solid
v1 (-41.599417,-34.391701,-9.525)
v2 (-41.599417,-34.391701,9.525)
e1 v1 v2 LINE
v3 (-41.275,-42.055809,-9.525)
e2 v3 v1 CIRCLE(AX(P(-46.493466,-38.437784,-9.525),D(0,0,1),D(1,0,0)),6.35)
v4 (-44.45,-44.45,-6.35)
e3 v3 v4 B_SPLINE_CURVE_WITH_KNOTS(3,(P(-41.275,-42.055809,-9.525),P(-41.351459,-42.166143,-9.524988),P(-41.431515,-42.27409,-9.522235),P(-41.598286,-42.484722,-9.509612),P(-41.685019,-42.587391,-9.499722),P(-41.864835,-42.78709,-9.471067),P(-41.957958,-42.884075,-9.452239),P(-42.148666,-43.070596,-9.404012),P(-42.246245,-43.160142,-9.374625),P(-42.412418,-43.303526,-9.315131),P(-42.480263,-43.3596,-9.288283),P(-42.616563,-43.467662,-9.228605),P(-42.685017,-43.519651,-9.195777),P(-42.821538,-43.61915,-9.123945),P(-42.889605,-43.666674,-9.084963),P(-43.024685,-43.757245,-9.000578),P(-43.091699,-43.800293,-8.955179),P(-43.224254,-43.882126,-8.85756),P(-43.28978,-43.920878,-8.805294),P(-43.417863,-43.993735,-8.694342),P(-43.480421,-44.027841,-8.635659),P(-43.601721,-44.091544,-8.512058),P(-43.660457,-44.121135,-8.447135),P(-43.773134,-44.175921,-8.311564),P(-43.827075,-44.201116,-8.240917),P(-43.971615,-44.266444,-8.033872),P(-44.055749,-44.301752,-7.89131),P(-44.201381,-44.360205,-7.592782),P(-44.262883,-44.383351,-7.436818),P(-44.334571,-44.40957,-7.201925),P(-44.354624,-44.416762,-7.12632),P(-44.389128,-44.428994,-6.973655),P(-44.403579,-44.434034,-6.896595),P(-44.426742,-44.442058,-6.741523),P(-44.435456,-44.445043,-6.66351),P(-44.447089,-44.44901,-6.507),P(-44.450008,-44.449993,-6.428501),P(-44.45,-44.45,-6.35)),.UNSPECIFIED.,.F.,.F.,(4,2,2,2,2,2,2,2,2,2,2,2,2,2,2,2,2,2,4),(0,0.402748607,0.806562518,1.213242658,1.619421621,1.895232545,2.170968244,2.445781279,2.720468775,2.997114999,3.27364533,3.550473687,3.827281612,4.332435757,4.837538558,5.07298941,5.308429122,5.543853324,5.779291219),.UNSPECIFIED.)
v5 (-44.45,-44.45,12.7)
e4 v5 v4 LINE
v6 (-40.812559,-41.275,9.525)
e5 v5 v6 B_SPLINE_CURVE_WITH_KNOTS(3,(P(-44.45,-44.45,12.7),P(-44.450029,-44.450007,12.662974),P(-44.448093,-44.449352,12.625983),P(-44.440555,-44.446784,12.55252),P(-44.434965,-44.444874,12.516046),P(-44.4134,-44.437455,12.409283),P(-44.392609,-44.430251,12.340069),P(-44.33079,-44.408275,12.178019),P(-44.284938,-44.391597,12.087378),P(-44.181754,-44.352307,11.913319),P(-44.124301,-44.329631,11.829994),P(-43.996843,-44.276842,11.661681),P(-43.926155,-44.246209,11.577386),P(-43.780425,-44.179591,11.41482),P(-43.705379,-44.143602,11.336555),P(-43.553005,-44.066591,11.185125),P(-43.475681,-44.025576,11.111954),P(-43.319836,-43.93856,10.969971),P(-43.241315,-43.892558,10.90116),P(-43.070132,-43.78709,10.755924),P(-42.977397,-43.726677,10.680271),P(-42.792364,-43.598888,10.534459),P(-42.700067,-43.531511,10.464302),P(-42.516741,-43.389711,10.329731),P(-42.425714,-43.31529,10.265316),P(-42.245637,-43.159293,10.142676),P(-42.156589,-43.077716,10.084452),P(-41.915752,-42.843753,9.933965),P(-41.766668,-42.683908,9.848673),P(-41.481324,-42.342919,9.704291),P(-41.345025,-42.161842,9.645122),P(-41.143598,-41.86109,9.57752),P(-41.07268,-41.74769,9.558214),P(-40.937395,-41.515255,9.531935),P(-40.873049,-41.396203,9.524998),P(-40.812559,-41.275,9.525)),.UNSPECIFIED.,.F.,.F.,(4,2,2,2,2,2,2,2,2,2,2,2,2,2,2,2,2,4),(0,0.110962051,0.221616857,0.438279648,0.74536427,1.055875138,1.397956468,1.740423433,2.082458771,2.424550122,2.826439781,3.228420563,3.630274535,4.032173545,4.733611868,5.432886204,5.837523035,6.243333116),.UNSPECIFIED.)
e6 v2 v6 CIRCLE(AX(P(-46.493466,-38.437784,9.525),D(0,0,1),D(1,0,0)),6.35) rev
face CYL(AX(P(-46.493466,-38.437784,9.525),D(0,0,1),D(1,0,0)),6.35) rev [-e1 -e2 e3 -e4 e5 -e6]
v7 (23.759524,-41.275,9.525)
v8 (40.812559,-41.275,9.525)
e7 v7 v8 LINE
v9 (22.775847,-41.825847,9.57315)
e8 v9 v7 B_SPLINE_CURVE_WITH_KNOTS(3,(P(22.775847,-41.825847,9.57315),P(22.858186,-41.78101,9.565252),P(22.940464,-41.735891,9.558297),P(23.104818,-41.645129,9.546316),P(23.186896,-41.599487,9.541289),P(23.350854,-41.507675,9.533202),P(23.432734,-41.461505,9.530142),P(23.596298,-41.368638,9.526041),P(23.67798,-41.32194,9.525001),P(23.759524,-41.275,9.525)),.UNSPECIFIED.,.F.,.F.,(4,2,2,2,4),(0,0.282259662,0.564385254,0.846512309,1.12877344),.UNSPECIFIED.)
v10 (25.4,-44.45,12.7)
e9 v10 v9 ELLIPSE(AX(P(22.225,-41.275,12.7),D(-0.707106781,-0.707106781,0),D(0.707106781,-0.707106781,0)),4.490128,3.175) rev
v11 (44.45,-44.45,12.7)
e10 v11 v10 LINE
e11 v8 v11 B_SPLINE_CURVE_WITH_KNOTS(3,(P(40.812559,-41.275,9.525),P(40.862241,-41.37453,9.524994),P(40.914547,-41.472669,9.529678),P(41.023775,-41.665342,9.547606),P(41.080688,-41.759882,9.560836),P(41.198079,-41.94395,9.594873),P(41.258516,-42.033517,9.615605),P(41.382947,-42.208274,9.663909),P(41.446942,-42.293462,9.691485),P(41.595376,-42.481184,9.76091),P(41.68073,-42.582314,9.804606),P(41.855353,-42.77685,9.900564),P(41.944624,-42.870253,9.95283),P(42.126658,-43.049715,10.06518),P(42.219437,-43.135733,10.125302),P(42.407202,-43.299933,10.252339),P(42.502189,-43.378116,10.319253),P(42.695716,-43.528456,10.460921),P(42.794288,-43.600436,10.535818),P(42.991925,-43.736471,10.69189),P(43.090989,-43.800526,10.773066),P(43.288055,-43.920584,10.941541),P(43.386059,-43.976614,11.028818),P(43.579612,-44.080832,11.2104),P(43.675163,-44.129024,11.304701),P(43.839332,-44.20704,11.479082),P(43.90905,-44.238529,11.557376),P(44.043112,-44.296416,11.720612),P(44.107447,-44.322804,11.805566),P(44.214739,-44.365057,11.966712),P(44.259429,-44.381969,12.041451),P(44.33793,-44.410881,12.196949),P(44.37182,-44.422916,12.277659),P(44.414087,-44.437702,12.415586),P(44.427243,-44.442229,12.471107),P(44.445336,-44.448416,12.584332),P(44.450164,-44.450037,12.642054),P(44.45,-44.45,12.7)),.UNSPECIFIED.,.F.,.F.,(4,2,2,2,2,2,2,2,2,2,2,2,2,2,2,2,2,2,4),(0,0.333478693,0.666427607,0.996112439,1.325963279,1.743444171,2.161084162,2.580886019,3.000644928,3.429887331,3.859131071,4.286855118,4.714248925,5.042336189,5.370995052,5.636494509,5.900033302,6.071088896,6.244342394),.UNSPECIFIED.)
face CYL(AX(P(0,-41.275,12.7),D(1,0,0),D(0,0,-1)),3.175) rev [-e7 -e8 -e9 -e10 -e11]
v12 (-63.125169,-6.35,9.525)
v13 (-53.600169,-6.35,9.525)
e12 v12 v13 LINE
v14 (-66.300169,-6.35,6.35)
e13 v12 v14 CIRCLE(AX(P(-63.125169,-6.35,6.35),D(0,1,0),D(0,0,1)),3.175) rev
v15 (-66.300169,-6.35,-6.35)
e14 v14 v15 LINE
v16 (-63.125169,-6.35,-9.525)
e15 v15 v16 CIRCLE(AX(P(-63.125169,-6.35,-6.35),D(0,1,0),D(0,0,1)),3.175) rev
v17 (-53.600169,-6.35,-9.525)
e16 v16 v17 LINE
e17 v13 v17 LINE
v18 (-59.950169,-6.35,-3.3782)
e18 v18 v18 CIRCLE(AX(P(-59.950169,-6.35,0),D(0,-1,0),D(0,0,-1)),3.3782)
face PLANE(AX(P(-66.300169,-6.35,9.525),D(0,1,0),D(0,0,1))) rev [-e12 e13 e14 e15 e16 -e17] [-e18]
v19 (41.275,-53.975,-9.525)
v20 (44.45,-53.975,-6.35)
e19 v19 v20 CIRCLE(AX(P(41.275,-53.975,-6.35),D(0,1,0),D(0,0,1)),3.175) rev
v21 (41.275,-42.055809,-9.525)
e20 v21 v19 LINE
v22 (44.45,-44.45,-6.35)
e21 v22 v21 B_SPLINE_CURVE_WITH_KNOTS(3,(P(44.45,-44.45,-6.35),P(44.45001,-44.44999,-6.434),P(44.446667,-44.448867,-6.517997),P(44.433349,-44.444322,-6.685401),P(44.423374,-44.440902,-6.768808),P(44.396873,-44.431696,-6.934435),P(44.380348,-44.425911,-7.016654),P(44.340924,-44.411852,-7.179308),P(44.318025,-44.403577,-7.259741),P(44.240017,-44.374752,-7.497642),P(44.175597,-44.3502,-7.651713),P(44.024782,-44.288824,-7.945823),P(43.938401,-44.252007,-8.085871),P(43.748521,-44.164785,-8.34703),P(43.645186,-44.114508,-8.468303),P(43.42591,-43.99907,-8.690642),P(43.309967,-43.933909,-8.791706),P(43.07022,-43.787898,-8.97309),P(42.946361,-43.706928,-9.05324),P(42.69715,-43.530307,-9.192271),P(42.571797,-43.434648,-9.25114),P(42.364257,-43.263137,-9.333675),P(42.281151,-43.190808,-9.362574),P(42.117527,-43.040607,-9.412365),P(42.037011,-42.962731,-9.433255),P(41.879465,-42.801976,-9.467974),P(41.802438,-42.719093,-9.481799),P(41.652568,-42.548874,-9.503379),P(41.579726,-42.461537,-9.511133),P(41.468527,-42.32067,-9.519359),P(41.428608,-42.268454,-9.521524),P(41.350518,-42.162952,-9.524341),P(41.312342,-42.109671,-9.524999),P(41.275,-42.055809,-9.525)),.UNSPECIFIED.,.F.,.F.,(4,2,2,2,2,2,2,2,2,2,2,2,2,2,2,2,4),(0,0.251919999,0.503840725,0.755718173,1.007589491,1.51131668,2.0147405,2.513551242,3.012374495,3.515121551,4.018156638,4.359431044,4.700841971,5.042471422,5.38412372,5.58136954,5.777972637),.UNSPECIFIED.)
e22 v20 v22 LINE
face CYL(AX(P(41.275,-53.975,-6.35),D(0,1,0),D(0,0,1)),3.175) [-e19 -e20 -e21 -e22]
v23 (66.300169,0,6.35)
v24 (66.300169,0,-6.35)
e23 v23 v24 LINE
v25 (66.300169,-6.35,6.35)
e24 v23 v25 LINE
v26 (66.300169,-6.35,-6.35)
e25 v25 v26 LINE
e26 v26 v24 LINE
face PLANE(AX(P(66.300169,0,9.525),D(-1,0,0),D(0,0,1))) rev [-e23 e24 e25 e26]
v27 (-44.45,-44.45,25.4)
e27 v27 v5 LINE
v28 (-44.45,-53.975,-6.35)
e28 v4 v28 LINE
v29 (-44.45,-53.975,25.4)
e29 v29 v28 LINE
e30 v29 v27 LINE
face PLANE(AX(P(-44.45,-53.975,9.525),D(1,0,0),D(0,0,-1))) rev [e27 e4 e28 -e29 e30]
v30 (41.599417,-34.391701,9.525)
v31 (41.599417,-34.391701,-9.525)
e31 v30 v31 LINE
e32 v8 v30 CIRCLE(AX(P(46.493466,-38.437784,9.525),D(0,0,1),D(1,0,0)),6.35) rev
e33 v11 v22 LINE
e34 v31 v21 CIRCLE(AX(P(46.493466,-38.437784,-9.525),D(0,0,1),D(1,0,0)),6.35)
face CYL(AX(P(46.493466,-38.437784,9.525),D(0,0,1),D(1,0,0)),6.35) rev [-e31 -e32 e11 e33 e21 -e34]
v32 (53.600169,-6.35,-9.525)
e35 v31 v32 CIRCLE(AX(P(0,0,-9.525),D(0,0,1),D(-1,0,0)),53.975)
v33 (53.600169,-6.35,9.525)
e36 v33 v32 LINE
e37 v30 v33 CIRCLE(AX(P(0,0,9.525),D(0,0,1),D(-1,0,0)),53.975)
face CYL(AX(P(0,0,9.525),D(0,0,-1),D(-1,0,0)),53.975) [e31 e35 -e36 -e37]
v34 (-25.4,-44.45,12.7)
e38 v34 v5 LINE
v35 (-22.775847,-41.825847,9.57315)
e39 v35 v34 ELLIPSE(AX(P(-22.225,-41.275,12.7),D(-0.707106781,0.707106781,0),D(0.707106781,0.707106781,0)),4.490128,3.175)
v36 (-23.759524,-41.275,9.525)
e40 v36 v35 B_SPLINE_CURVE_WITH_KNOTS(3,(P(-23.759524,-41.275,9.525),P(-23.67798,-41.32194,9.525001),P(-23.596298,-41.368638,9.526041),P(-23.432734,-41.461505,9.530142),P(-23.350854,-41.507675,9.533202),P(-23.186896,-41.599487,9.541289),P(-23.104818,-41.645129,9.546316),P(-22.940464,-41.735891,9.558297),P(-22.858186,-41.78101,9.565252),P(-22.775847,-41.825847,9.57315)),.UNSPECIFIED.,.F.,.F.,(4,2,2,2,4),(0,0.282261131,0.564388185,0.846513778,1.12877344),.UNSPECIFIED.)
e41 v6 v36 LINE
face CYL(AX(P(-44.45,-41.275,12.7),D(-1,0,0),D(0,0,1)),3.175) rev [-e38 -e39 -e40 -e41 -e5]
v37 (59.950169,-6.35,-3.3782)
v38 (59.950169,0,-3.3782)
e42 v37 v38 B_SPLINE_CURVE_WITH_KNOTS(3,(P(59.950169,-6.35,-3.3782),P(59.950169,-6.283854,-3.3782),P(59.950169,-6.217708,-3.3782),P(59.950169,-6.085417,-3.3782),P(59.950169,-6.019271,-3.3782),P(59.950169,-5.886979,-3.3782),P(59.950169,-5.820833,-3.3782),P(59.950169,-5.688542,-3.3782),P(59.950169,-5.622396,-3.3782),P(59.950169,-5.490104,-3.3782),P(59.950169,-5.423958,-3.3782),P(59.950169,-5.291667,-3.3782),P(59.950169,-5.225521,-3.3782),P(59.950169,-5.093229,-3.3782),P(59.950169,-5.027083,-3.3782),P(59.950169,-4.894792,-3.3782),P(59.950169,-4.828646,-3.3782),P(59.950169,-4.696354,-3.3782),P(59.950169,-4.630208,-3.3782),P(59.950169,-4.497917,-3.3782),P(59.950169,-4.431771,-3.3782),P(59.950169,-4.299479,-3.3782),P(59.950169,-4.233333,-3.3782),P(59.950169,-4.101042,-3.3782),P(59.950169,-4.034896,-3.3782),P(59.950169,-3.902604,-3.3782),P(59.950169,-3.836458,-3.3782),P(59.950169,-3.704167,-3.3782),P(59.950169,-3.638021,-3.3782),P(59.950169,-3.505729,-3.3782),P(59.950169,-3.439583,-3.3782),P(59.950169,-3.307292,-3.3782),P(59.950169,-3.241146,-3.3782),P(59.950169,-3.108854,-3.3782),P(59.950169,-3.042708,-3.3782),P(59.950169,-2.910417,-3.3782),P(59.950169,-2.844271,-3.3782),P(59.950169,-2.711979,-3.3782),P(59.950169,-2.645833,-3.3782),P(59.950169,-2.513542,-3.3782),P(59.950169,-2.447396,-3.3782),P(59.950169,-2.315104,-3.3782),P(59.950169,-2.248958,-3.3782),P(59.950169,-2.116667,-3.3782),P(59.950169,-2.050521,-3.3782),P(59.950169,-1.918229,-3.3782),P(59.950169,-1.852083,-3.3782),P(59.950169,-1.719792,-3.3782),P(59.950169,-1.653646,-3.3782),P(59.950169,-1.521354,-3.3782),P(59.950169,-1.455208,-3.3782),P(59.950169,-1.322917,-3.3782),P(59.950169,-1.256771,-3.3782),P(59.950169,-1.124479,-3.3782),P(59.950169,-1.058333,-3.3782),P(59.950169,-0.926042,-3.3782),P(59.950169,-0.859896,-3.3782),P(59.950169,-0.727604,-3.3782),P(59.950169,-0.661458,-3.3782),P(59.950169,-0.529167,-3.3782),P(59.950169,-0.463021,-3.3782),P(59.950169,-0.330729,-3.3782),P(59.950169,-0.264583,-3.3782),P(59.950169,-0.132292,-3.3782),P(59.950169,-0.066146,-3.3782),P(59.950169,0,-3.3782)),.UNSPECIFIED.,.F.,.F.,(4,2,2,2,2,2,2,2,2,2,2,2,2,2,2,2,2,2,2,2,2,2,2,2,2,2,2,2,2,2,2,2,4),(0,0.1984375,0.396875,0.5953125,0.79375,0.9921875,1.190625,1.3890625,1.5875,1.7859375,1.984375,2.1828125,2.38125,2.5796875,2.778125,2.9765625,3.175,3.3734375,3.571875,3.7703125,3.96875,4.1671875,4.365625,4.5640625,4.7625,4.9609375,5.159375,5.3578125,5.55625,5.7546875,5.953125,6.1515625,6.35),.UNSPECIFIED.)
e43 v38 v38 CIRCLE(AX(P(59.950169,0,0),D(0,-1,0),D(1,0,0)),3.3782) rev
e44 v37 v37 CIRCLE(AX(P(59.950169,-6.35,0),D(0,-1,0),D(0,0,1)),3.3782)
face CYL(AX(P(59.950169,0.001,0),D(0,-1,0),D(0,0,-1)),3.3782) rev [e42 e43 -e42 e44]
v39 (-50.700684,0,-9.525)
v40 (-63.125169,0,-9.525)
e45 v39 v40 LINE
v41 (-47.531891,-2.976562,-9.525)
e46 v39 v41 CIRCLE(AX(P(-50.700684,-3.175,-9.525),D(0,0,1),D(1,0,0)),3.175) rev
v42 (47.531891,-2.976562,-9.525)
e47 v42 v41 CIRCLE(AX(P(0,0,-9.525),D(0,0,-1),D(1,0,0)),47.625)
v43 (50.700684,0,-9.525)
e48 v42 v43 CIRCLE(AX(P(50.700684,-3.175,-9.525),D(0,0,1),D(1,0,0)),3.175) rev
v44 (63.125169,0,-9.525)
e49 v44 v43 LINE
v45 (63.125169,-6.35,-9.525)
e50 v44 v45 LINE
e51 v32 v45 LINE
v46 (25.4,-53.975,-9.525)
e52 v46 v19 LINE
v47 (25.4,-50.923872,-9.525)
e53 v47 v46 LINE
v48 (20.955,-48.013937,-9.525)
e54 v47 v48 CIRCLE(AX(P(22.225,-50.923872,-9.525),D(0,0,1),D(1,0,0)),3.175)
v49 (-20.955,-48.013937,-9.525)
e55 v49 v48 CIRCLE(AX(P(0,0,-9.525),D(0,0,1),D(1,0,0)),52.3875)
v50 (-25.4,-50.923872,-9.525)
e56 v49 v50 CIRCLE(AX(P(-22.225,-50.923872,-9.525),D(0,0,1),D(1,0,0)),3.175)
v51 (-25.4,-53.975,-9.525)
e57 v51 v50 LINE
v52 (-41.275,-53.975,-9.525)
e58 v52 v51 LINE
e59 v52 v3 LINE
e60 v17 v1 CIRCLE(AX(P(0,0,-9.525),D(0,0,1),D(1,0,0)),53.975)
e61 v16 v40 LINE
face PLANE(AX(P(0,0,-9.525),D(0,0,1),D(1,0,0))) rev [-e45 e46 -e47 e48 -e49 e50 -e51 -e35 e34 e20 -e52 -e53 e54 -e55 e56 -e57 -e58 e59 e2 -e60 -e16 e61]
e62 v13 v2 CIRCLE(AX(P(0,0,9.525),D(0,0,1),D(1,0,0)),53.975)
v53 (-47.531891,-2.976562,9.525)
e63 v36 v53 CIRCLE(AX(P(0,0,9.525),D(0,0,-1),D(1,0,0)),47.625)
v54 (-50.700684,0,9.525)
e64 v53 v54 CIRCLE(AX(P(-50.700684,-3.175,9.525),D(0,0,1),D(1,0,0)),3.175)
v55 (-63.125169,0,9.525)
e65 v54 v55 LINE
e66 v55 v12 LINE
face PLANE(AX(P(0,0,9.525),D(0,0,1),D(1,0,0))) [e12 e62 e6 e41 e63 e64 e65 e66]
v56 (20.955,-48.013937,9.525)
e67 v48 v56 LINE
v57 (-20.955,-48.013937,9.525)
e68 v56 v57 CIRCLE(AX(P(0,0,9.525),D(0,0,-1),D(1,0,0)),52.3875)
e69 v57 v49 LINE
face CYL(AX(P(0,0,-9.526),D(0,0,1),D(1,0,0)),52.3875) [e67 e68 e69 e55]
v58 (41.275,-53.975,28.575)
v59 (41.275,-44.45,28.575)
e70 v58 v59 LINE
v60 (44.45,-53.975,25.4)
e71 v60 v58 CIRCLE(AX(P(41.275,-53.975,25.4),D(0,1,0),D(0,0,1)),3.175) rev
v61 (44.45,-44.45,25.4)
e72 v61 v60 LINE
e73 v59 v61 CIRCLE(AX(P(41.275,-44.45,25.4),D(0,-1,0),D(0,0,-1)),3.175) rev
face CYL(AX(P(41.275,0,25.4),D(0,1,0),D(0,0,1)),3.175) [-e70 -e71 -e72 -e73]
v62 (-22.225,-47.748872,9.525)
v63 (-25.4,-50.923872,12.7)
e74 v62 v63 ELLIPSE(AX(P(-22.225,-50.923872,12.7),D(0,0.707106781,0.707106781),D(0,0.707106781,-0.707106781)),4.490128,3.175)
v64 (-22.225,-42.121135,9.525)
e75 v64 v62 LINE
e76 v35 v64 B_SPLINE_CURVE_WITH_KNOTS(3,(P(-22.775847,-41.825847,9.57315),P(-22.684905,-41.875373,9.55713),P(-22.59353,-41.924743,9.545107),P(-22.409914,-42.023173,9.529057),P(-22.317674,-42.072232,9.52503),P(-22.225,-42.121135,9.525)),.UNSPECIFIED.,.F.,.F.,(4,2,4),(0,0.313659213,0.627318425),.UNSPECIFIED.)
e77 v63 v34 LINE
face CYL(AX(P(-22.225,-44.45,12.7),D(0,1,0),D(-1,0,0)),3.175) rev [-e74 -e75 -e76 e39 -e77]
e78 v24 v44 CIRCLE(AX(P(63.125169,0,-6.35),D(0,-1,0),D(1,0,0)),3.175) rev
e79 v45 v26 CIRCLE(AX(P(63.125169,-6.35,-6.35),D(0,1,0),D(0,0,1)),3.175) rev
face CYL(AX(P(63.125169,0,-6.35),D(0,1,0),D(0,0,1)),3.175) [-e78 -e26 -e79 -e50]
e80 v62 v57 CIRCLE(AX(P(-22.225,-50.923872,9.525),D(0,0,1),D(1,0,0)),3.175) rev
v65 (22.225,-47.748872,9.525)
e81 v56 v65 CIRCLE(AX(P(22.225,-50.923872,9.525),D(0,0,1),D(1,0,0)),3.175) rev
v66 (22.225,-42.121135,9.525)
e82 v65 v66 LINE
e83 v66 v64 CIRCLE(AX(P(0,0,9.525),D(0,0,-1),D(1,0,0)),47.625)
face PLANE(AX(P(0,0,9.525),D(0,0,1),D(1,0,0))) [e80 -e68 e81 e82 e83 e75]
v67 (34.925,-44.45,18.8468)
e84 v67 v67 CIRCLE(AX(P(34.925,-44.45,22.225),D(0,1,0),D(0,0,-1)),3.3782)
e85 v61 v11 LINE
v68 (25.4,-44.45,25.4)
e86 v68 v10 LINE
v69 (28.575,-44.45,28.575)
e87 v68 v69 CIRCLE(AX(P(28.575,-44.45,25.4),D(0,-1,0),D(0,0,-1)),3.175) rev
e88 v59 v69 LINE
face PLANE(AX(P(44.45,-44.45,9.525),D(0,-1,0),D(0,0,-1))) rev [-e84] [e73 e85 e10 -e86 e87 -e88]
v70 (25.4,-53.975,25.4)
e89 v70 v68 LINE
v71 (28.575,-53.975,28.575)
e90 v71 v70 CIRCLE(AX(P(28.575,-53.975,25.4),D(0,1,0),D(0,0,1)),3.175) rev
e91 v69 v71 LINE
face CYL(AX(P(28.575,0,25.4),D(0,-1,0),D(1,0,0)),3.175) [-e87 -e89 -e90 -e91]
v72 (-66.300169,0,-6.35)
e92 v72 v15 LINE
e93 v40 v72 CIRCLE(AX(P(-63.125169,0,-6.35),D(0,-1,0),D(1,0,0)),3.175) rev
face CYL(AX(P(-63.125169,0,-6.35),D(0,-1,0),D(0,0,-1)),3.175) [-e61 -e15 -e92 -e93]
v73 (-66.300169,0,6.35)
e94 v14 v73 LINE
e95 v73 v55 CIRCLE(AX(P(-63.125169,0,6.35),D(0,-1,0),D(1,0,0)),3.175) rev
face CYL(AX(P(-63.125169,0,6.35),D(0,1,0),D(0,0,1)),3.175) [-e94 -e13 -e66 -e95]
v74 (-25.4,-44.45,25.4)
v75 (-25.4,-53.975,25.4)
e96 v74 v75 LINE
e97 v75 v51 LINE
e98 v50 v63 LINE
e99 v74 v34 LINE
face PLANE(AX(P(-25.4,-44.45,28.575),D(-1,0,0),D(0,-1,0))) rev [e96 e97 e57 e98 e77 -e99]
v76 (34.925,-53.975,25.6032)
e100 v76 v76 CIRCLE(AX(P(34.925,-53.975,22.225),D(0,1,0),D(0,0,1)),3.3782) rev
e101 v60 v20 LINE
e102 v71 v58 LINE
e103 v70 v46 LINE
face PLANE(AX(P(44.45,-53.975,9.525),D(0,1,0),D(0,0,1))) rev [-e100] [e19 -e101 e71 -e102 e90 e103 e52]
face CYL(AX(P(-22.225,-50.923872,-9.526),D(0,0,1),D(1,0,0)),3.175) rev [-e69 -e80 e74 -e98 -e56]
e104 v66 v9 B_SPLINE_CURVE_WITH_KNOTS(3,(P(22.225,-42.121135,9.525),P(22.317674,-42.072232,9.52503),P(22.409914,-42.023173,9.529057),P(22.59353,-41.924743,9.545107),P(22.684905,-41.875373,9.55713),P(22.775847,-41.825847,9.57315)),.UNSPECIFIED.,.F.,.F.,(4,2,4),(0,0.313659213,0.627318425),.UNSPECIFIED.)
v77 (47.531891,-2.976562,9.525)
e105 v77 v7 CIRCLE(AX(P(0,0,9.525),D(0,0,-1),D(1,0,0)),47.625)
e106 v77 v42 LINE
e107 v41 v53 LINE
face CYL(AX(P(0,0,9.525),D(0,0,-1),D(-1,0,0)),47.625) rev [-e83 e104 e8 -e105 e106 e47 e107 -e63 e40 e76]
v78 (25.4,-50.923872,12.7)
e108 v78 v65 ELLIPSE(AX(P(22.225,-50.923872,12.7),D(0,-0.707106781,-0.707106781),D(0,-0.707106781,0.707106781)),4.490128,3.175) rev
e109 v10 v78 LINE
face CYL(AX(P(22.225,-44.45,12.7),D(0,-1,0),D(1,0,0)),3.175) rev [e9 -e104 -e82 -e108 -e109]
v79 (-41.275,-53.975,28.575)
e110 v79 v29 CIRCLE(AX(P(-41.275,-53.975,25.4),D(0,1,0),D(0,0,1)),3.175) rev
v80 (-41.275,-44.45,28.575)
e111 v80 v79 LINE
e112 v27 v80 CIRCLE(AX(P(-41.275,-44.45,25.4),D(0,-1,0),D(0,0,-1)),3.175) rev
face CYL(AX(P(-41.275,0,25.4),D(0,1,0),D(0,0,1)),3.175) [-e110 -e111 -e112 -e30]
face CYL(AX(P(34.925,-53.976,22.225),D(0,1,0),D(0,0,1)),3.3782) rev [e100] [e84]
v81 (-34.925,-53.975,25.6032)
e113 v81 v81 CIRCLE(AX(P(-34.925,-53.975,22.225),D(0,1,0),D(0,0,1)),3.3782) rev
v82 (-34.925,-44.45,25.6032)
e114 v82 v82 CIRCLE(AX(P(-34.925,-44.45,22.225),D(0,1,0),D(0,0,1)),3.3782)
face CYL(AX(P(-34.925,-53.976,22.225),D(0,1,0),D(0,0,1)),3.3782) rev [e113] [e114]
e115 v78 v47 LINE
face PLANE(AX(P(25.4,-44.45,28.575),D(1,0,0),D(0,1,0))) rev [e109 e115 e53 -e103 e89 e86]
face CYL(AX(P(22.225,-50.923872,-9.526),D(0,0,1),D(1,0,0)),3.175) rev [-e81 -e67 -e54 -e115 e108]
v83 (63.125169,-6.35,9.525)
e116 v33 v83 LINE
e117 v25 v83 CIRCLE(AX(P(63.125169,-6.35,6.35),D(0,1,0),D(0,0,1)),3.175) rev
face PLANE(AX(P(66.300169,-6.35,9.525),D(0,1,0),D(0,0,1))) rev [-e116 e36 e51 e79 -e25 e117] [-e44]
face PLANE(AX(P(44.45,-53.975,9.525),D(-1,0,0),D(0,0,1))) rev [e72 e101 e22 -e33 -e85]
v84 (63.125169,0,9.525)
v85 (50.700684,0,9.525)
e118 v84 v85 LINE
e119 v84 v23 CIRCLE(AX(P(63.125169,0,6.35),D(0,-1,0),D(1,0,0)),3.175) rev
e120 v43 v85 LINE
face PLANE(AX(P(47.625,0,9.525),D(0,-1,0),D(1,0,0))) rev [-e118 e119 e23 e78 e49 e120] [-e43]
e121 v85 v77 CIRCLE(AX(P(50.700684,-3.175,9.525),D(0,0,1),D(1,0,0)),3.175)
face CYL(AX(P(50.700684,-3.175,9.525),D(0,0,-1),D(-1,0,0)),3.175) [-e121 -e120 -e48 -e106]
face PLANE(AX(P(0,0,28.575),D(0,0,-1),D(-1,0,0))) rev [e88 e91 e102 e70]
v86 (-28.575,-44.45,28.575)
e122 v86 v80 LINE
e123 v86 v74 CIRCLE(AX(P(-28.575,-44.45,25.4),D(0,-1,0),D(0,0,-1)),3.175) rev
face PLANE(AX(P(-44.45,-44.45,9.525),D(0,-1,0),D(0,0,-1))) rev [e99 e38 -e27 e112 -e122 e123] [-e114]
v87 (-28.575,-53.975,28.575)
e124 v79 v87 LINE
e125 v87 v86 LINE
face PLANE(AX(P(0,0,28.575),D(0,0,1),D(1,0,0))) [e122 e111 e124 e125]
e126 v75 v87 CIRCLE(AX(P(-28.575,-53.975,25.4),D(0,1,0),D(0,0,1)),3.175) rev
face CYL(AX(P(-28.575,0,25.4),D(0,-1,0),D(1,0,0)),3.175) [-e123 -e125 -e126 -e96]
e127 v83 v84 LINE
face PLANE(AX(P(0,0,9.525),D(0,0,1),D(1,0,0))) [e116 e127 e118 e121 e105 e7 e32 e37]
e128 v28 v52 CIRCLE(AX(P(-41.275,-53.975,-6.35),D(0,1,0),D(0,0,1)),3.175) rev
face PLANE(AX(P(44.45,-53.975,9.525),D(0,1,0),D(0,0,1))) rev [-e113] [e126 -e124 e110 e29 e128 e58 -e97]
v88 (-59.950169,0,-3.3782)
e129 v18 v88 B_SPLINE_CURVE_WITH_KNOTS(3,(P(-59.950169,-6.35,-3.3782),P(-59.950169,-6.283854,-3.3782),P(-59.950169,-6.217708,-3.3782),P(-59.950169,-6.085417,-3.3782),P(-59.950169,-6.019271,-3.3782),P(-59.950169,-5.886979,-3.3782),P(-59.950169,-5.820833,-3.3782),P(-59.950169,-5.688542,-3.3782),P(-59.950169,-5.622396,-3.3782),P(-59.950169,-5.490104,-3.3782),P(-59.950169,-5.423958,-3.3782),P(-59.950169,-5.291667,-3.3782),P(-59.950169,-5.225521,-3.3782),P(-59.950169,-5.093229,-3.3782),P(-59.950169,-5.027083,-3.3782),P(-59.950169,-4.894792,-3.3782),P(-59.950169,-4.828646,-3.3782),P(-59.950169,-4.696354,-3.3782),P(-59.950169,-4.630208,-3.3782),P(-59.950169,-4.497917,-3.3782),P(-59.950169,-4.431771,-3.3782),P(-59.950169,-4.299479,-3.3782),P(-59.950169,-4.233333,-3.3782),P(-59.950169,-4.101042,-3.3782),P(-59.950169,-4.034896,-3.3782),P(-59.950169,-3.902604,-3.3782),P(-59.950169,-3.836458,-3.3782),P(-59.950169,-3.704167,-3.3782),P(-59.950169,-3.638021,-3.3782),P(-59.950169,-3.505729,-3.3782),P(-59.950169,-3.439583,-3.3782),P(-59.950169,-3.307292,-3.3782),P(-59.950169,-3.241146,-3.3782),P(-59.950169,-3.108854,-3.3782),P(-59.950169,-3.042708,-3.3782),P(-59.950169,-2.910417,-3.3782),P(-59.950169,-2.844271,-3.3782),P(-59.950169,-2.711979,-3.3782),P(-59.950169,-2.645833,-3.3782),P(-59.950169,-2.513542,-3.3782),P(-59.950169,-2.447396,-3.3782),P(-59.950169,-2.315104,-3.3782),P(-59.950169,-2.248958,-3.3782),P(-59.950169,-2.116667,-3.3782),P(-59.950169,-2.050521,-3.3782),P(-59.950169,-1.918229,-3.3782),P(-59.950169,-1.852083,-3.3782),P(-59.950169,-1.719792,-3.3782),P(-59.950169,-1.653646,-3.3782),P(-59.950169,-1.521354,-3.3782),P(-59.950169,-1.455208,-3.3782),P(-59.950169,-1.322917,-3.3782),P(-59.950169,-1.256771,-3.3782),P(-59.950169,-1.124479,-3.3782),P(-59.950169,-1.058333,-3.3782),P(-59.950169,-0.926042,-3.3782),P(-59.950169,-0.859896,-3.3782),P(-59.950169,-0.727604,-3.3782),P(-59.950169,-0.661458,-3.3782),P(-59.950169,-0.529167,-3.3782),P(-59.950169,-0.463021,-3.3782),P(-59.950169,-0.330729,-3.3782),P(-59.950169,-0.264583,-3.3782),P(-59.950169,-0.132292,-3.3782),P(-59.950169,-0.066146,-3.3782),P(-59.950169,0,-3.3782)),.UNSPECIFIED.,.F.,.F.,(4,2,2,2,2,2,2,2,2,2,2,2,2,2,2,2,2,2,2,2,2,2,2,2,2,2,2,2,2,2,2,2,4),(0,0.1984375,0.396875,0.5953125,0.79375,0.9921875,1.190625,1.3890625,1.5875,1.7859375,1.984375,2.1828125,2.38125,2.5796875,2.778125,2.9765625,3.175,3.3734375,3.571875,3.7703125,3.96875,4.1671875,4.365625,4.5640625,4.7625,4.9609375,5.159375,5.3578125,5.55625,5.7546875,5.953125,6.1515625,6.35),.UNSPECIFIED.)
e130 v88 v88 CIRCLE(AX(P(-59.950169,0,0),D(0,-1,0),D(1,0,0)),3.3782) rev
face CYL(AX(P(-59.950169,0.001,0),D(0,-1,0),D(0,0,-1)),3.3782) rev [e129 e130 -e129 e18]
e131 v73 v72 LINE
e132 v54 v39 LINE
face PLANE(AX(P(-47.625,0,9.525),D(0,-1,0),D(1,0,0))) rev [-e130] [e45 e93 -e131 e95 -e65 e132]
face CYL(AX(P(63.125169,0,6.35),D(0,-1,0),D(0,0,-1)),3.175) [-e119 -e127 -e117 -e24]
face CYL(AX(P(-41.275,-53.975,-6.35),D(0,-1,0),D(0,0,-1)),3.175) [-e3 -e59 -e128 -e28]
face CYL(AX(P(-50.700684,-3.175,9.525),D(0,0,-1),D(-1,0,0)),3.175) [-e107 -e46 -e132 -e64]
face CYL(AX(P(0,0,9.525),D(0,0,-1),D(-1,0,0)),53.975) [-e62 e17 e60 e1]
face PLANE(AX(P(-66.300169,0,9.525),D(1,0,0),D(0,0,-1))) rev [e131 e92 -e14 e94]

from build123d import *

# Parameters (mm, degrees)
BOSS_EXTRUDE2_DEPTH = 9.525
CUT_EXTRUDE2_REACH  = 84.186
SKETCH5_R           = 3.3782
BOSS_EXTRUDE3_DEPTH = 19.05
CUT_EXTRUDE3_REACH  = 86.782
SKETCH7_R           = 3.3782
CUT_EXTRUDE5_REACH  = 89.589
FILLET3_R           = 6.35
FILLET4_R           = 3.175


with BuildPart() as part:
    # Sketch1 → Boss-Extrude2 (new, symmetric)
    with BuildSketch(Plane.XY):
        with BuildLine():
            Line((-47.62499999999999, 0), (-66.30016907622587, -2.27e-15))
            Line((-66.30016907622587, -2.27e-15), (-66.30016907622587, -6.350000000000002))
            Line((-66.30016907622587, -6.350000000000002), (-53.60016907622586, -6.350000000000002))
            ThreePointArc((-53.60016907622586, -6.350000000000002), (-46.217987777388224, -27.87827524810658), (-30.618591166152626, -44.449999999999996))
            Line((-30.618591166152626, -44.449999999999996), (-44.449999999999996, -44.449999999999996))
            Line((-44.449999999999996, -44.449999999999996), (-44.449999999999996, -53.975))
            Line((-44.449999999999996, -53.975), (44.449999999999996, -53.975))
            Line((44.449999999999996, -53.975), (44.449999999999996, -44.449999999999996))
            Line((44.449999999999996, -44.449999999999996), (30.618591166152626, -44.449999999999996))
            ThreePointArc((30.618591166152626, -44.449999999999996), (46.21798777738823, -27.878275248106572), (53.60016907622586, -6.350000000000002))
            Line((53.60016907622586, -6.350000000000002), (66.30016907622587, -6.350000000000002))
            Line((66.30016907622587, -6.350000000000002), (66.30016907622587, -2.27e-15))
            Line((66.30016907622587, -2.27e-15), (47.62499999999999, 0))
            ThreePointArc((47.62499999999999, 0), (-8.75e-15, -47.62499999999999), (-47.62499999999999, 0))
        make_face()
    extrude(amount=BOSS_EXTRUDE2_DEPTH, both=True)

    # Sketch5 → Cut-Extrude2 (cut, up to next)
    with BuildSketch(Plane.XZ.offset(6.350000000000002), mode=Mode.PRIVATE) as cut_extrude2_sk1:
        with Locations(Location((-59.95016907622586, 0, 0), (0, 0, 270))):
            Circle(SKETCH5_R)
    cut_extrude2_tool1 = extrude(cut_extrude2_sk1.sketch, amount=-CUT_EXTRUDE2_REACH, mode=Mode.PRIVATE) & part.part
    # Sketch5 → Cut-Extrude2 (cut, up to next)
    with BuildSketch(Plane.XZ.offset(6.350000000000002), mode=Mode.PRIVATE) as cut_extrude2_sk2:
        with Locations(Location((59.95016907622586, 0, 0), (0, 0, 270))):
            Circle(SKETCH5_R)
    cut_extrude2_tool2 = extrude(cut_extrude2_sk2.sketch, amount=-CUT_EXTRUDE2_REACH, mode=Mode.PRIVATE) & part.part
    add(cut_extrude2_tool1.solids().sort_by_distance((-59.950169, -6.35, 0))[0], mode=Mode.SUBTRACT)
    add(cut_extrude2_tool2.solids().sort_by_distance((59.950169, -6.35, 0))[0], mode=Mode.SUBTRACT)

    # Sketch6 → Boss-Extrude3 (add)
    with BuildSketch(Plane.XY.offset(9.525)):
        Polygon((-44.449999999999996, -44.449999999999996), (-25.39999999999999, -44.449999999999996), (-25.399999999999995, -53.975), (-44.449999999999996, -53.975), align=None)
        Polygon((44.449999999999996, -53.975), (25.399999999999995, -53.975), (25.39999999999999, -44.449999999999996), (44.449999999999996, -44.449999999999996), align=None)
    extrude(amount=BOSS_EXTRUDE3_DEPTH)

    # Sketch7 → Cut-Extrude3 (cut, up to next)
    with BuildSketch(Plane(origin=(0, -44.449999999999996, 0), x_dir=(1, 0, 0), z_dir=(0, 1, 0)), mode=Mode.PRIVATE) as cut_extrude3_sk1:
        with Locations(Location((-34.925, -22.225, 0), (0, 0, 270))):
            Circle(SKETCH7_R)
    cut_extrude3_tool1 = extrude(cut_extrude3_sk1.sketch, amount=-CUT_EXTRUDE3_REACH, mode=Mode.PRIVATE) & part.part
    # Sketch7 → Cut-Extrude3 (cut, up to next)
    with BuildSketch(Plane(origin=(0, -44.449999999999996, 0), x_dir=(1, 0, 0), z_dir=(0, 1, 0)), mode=Mode.PRIVATE) as cut_extrude3_sk2:
        with Locations(Location((34.925, -22.225, 0), (0, 0, 270))):
            Circle(SKETCH7_R)
    cut_extrude3_tool2 = extrude(cut_extrude3_sk2.sketch, amount=-CUT_EXTRUDE3_REACH, mode=Mode.PRIVATE) & part.part
    add(cut_extrude3_tool1.solids().sort_by_distance((-34.925, -44.45, 22.225))[0], mode=Mode.SUBTRACT)
    add(cut_extrude3_tool2.solids().sort_by_distance((34.925, -44.45, 22.225))[0], mode=Mode.SUBTRACT)

    # Sketch10 → Cut-Extrude5 (cut, up to next)
    with BuildSketch(Plane.XY.offset(9.525), mode=Mode.PRIVATE) as cut_extrude5_sk1:
        with BuildLine():
            Line((-25.4, -45.81801126467626), (-25.399999999999995, -53.975))
            Line((-25.399999999999995, -53.975), (25.399999999999995, -53.975))
            Line((25.399999999999995, -53.975), (25.39999999999999, -45.818011264676265))
            ThreePointArc((25.39999999999999, -45.818011264676265), (3.21e-15, -52.3875), (-25.4, -45.81801126467626))
        make_face()
    cut_extrude5_tool1 = extrude(cut_extrude5_sk1.sketch, amount=-CUT_EXTRUDE5_REACH, mode=Mode.PRIVATE) & part.part
    add(cut_extrude5_tool1.solids().sort_by_distance((-24.885493, -49.896506, 9.525))[0], mode=Mode.SUBTRACT)

    # Fillet3
    # the kernel refuses this fillet: 6.35 mm, written as the material it adds along each edge
    with BuildSketch(Plane(origin=(30.618591166152626, -44.449999999999996, -9.525), x_dir=(1, -5.1e-16, 0), z_dir=(0, 0, 1))) as fillet3_piece_1:
        with BuildLine():
            CenterArc((15.87487517374333, 6.012216339895979), FILLET3_R, 140.4182638704102, 110.80957357767647)
            Line((10.980826085333229, 10.058298830433243), (10.88294510356503, 10.13922048024399))
            ThreePointArc((10.88294510356503, 10.13922048024399), (5.753170572776132, 4.742292284663466), (-0.07204374392036078, 0.10458823529411627))
            Line((-0.07204374392036078, 0.10458823529411627), (7e-17, -0.12700000000000244))
            ThreePointArc((7e-17, -0.12700000000000244), (6.915704416923688, -0.1269999999999989), (13.790539507049452, -0.12024432679791633))
            Line((13.790539507049452, -0.12024432679791633), (13.83140883384737, 0))
        make_face()
    extrude(amount=19.05)
    with BuildSketch(Plane(origin=(-30.618591166152626, -44.45, -9.525), x_dir=(-0.7374035751622449, 0.6754524167829585, 0), z_dir=(0, 0, 1))) as fillet3_piece_2:
        with BuildLine():
            CenterArc((15.767155765377446, 6.2892929785445775), FILLET3_R, 151.26145537711756, 110.80957357767625)
            Line((10.199330323609711, 9.342458524335363), (10.08797381477436, 9.403521835251178))
            ThreePointArc((10.08797381477436, 9.403521835251178), (5.013882704873423, 4.764879516213288), (-0.08578245693143738, 0.0936502540456069))
            Line((-0.08578245693143738, 0.0936502540456069), (0.01751906196152835, -0.1257858595708917))
            ThreePointArc((0.01751906196152835, -0.1257858595708917), (7.445601333650467, 0.3890096823710894), (14.873683605339394, -0.12578585957089045))
            Line((14.873683605339394, -0.12578585957089045), (14.89120266730092, 1.6e-16))
        make_face()
    extrude(amount=19.05)

    # Fillet4
    # the kernel refuses this fillet: 3.175 mm, written as the material it adds along each edge
    with BuildSketch(Plane(origin=(-44.45000000000031, -44.44999999999735, 9.525), x_dir=(1.3875e-13, 1, -5.6e-16), z_dir=(1, -1.3875e-13, 0))) as fillet4_piece_1_section:
        with BuildLine():
            CenterArc((FILLET4_R, FILLET4_R), FILLET4_R, 180.00000000000003, 90)
            Line((-8.88e-15, FILLET4_R), (0, 0))
            Line((0, 0), (FILLET4_R, 0))
        make_face()
    fillet4_piece_1 = extrude(amount=19.050000000000317, mode=Mode.PRIVATE)
    fillet4_piece_1 = fillet4_piece_1 - Plane(origin=(-46.493466339895136, -38.43778366010152, 10.266773155518875), x_dir=(-0.7374035751621124, 0.6754524167831031, 0), z_dir=(0, 0, -1)) * Cylinder(6.35, 51, mode=Mode.PRIVATE)
    add(fillet4_piece_1)
    with BuildSketch(Plane(origin=(25.39999999999999, -44.449999999999996, 9.525), x_dir=(-7.5e-16, 1, -5.6e-16), z_dir=(1, 7.5e-16, 0))) as fillet4_piece_2_section:
        with BuildLine():
            CenterArc((FILLET4_R, FILLET4_R), FILLET4_R, 180.00000000000003, 90)
            Line((-8.88e-15, FILLET4_R), (0, 0))
            Line((0, 0), (FILLET4_R, 0))
        make_face()
    fillet4_piece_2 = extrude(amount=19.049999999999997, mode=Mode.PRIVATE)
    fillet4_piece_2 = fillet4_piece_2 - Plane(origin=(46.493466339896, -38.437783660104, 10.26677297379504), x_dir=(1, 0, 0), z_dir=(0, 0, -1)) * Cylinder(6.35, 51, mode=Mode.PRIVATE)
    add(fillet4_piece_2)
    with BuildSketch(Plane(origin=(25.399999999999984, -53.75551126467627, 9.525), x_dir=(-1, -3.7e-16, -5.6e-16), z_dir=(-3.7e-16, 1, 0))) as fillet4_piece_3_section:
        with BuildLine():
            CenterArc((FILLET4_R, FILLET4_R), FILLET4_R, 180.00000000000003, 90)
            Line((-5.33e-15, FILLET4_R), (0, 0))
            Line((0, 0), (FILLET4_R, 0))
        make_face()
    fillet4_piece_3 = extrude(amount=9.305511264676277, mode=Mode.PRIVATE)
    fillet4_piece_3 = fillet4_piece_3 & Plane(origin=(4.44e-15, 3.553e-14, 10.160375888913034), x_dir=(0.4848484848484843, -0.8745981630098072, 0), z_dir=(0, 0, 1)) * Cylinder(52.387500000000024, 32, mode=Mode.PRIVATE)
    add(fillet4_piece_3)
    with BuildSketch(Plane(origin=(-25.39999999999999, -44.449999999999996, 9.525), x_dir=(1, -3.7e-16, -5.6e-16), z_dir=(-3.7e-16, -1, 0))) as fillet4_piece_4_section:
        with BuildLine():
            CenterArc((FILLET4_R, FILLET4_R), FILLET4_R, 180.00000000000003, 90)
            Line((-5.33e-15, FILLET4_R), (0, 0))
            Line((0, 0), (FILLET4_R, 0))
        make_face()
    fillet4_piece_4 = extrude(amount=9.305511264676262, mode=Mode.PRIVATE)
    fillet4_piece_4 = fillet4_piece_4 & Plane(origin=(4.44e-15, 3.553e-14, 10.160372154025156), x_dir=(0.4848484848484843, -0.8745981630098072, 0), z_dir=(0, 0, 1)) * Cylinder(52.387500000000024, 32, mode=Mode.PRIVATE)
    add(fillet4_piece_4)
    with BuildSketch(Plane(origin=(-25.4, -45.81801126467626, 9.525), x_dir=(7e-16, -1, 0), z_dir=(0, 0, -1))) as fillet4_piece_5:
        with BuildLine():
            CenterArc((5.1058611455205085, -3.1750000000000007), FILLET4_R, 90.00000000000004, 113.57817847820172)
            ThreePointArc((2.1959255792235512, -4.444999999999995), (1.1505753407627795, -2.196508268422785), (0, 0))
            Line((0, 0), (5.105861145520507, 0))
        make_face()
    extrude(amount=19.05)
    with BuildSketch(Plane(origin=(25.39999999999999, -45.81801126467626, 9.525), x_dir=(-0.8965609468945661, -0.44292038619092594, 0), z_dir=(0, 0, -1))) as fillet4_piece_6:
        with BuildLine():
            CenterArc((5.108070996801428, -3.1714434771838524), FILLET4_R, 92.71218377423436, 113.57817847820183)
            Line((2.26148999041118, -4.577715703340043), (0, 0))
            ThreePointArc((0, 0), (2.4789168072712826, -0.05868262646643985), (4.957833614542567, -4e-17))
        make_face()
    extrude(amount=19.05)
    with BuildSketch(Plane(origin=(-44.45000000000031, -44.44999999999735, 9.525), x_dir=(1.3875e-13, 1, -5.6e-16), z_dir=(1, -1.3875e-13, 0))) as fillet4_piece_7a_section:
        with BuildLine():
            CenterArc((FILLET4_R, FILLET4_R), FILLET4_R, 180.00000000000003, 90)
            Line((-8.88e-15, FILLET4_R), (0, 0))
            Line((0, 0), (FILLET4_R, 0))
        make_face()
    fillet4_piece_7a = extrude(amount=26.987500000000313, mode=Mode.PRIVATE)
    fillet4_piece_7a = fillet4_piece_7a - Plane(origin=(-1.78e-15, -1.78e-15, 10.332620493512062), x_dir=(1, 4e-17, 0), z_dir=(0, 0, 1)) * Cylinder(47.62499999999999, 67, mode=Mode.PRIVATE)
    fillet4_piece_7a = split(fillet4_piece_7a, bisect_by=Plane(origin=(-25.4, -43.88290826667805, 10.332620493512062), z_dir=(1, 4.4e-16, 0)), keep=Keep.TOP, mode=Mode.PRIVATE)
    with BuildSketch(Plane(origin=(-25.400000000000002, -36.512499999999996, 9.525), x_dir=(1, -3.7e-16, -5.6e-16), z_dir=(-3.7e-16, -1, 0))) as fillet4_piece_7b_section:
        with BuildLine():
            CenterArc((FILLET4_R, FILLET4_R), FILLET4_R, 180.00000000000003, 90)
            Line((-1.78e-15, FILLET4_R), (0, 0))
            Line((0, 0), (FILLET4_R, 0))
        make_face()
    fillet4_piece_7b = extrude(amount=17.243011264676262, mode=Mode.PRIVATE)
    fillet4_piece_7b = fillet4_piece_7b - Plane(origin=(-1.78e-15, -1.78e-15, 10.288288962846478), x_dir=(1, 4e-17, 0), z_dir=(0, 0, 1)) * Cylinder(47.62499999999999, 48, mode=Mode.PRIVATE)
    fillet4_piece_7b = split(fillet4_piece_7b, bisect_by=Plane(origin=(-24.755790734076196, -44.449999999999996, 10.288288962846478), z_dir=(0, 1, 0)), keep=Keep.TOP, mode=Mode.PRIVATE)
    fillet4_piece_7 = fillet4_piece_7a & fillet4_piece_7b
    add(fillet4_piece_7)
    with BuildSketch(Plane(origin=(17.46249999999999, -44.44999999999999, 9.525), x_dir=(-7.5e-16, 1, -5.6e-16), z_dir=(1, 7.5e-16, 0))) as fillet4_piece_8a_section:
        with BuildLine():
            CenterArc((FILLET4_R, FILLET4_R), FILLET4_R, 180.00000000000003, 90)
            Line((-1.78e-15, FILLET4_R), (0, 0))
            Line((0, 0), (FILLET4_R, 0))
        make_face()
    fillet4_piece_8a = extrude(amount=26.987499999999994, mode=Mode.PRIVATE)
    fillet4_piece_8a = fillet4_piece_8a - Plane(origin=(-1.78e-15, -1.78e-15, 10.33262094142748), x_dir=(1, 4e-17, 0), z_dir=(0, 0, 1)) * Cylinder(47.62499999999999, 67, mode=Mode.PRIVATE)
    fillet4_piece_8a = split(fillet4_piece_8a, bisect_by=Plane(origin=(25.39999999999999, -43.882907820027945, 10.33262094142748), z_dir=(-1, -4.4e-16, 0)), keep=Keep.TOP, mode=Mode.PRIVATE)
    with BuildSketch(Plane(origin=(25.399999999999984, -53.75551126467627, 9.525), x_dir=(-1, -3.7e-16, -5.6e-16), z_dir=(-3.7e-16, 1, 0))) as fillet4_piece_8b_section:
        with BuildLine():
            CenterArc((FILLET4_R, FILLET4_R), FILLET4_R, 180.00000000000003, 90)
            Line((-5.33e-15, FILLET4_R), (0, 0))
            Line((0, 0), (FILLET4_R, 0))
        make_face()
    fillet4_piece_8b = extrude(amount=17.243011264676284, mode=Mode.PRIVATE)
    fillet4_piece_8b = fillet4_piece_8b - Plane(origin=(-1.78e-15, -1.78e-15, 10.28828876878144), x_dir=(1, 4e-17, 0), z_dir=(0, 0, 1)) * Cylinder(47.62499999999999, 48, mode=Mode.PRIVATE)
    fillet4_piece_8b = split(fillet4_piece_8b, bisect_by=Plane(origin=(24.755792568024695, -44.449999999999996, 10.28828876878144), z_dir=(0, 1, 0)), keep=Keep.TOP, mode=Mode.PRIVATE)
    fillet4_piece_8 = fillet4_piece_8a & fillet4_piece_8b
    add(fillet4_piece_8)
    with BuildSketch(Plane(origin=(25.399999999999984, -53.75551126467627, 9.525), x_dir=(-1, -3.7e-16, -5.6e-16), z_dir=(-3.7e-16, 1, 0))) as fillet4_piece_9a_section:
        with BuildLine():
            CenterArc((FILLET4_R, FILLET4_R), FILLET4_R, 180.00000000000003, 90)
            Line((-5.33e-15, FILLET4_R), (0, 0))
            Line((0, 0), (FILLET4_R, 0))
        make_face()
    fillet4_piece_9a = extrude(amount=9.305511264676277, mode=Mode.PRIVATE)
    fillet4_piece_9a = fillet4_piece_9a - Plane(origin=(4.44e-15, 3.553e-14, 10.263166034588224), x_dir=(0.4848484848484843, -0.8745981630098072, 0), z_dir=(0, 0, 1)) * Cylinder(52.387500000000024, 32, mode=Mode.PRIVATE)
    with BuildSketch(Plane(origin=(25.39999999999999, -45.81801126467626, 22.289652863801265), x_dir=(-0.8965609468945661, -0.44292038619092594, 0), z_dir=(0, 0, -1))) as fillet4_piece_9b_section:
        with BuildLine():
            CenterArc((5.108070996801428, -3.1714434771838524), FILLET4_R, 92.71218377423436, 113.57817847820183)
            Line((2.26148999041118, -4.577715703340043), (0, 0))
            ThreePointArc((0, 0), (2.4789168072712826, -0.05868262646643985), (4.957833614542567, -4e-17))
        make_face()
    fillet4_piece_9b = extrude(amount=31.814652863801264, mode=Mode.PRIVATE)
    fillet4_piece_9b = split(fillet4_piece_9b, bisect_by=Plane(origin=(24.331684208518332, -47.62488744049409, 9.525), z_dir=(0, 0, 1)), keep=Keep.TOP, mode=Mode.PRIVATE)
    fillet4_piece_9 = fillet4_piece_9a & fillet4_piece_9b
    add(fillet4_piece_9)
    with BuildSketch(Plane(origin=(-25.39999999999999, -44.449999999999996, 9.525), x_dir=(1, -3.7e-16, -5.6e-16), z_dir=(-3.7e-16, -1, 0))) as fillet4_piece_10a_section:
        with BuildLine():
            CenterArc((FILLET4_R, FILLET4_R), FILLET4_R, 180.00000000000003, 90)
            Line((-5.33e-15, FILLET4_R), (0, 0))
            Line((0, 0), (FILLET4_R, 0))
        make_face()
    fillet4_piece_10a = extrude(amount=9.305511264676262, mode=Mode.PRIVATE)
    fillet4_piece_10a = fillet4_piece_10a - Plane(origin=(4.44e-15, 3.553e-14, 10.263163738620651), x_dir=(0.4848484848484843, -0.8745981630098072, 0), z_dir=(0, 0, 1)) * Cylinder(52.387500000000024, 32, mode=Mode.PRIVATE)
    with BuildSketch(Plane(origin=(-25.4, -45.81801126467625, 22.289652863801265), x_dir=(7e-16, -1, 0), z_dir=(0, 0, -1))) as fillet4_piece_10b_section:
        with BuildLine():
            CenterArc((5.105861145520516, -3.1750000000000007), FILLET4_R, 90.00000000000004, 113.57817847820172)
            ThreePointArc((2.1959255792235584, -4.444999999999995), (1.1505753407627866, -2.196508268422785), (0, 0))
            Line((0, 0), (5.105861145520514, 0))
        make_face()
    fillet4_piece_10b = extrude(amount=31.814652863801264, mode=Mode.PRIVATE)
    fillet4_piece_10b = split(fillet4_piece_10b, bisect_by=Plane(origin=(-24.331684208518332, -47.624887440494085, 9.525), z_dir=(0, 0, 1)), keep=Keep.TOP, mode=Mode.PRIVATE)
    fillet4_piece_10 = fillet4_piece_10a & fillet4_piece_10b
    add(fillet4_piece_10)
    # the kernel refuses this fillet: 3.175 mm, written as the material it takes off along each edge
    with BuildSketch(Plane(origin=(-66.30016907622587, 7.937499999999994, 9.525), x_dir=(0, 0, -1), z_dir=(0, -1, 0))) as fillet4_2_piece_1:
        with BuildLine():
            CenterArc((FILLET4_R, FILLET4_R), FILLET4_R, 180, 90)
            Line((-1.78e-15, FILLET4_R), (0, 0))
            Line((0, 0), (FILLET4_R, 0))
        make_face()
    extrude(amount=22.22499999999999, mode=Mode.SUBTRACT)
    with BuildSketch(Plane(origin=(66.30016907622587, -14.287500000000016, -9.525), x_dir=(-1, 0, 0), z_dir=(0, 1, 0)), Plane(origin=(-66.30016907622587, 7.937499999999986, -9.525), x_dir=(1, 0, 0), z_dir=(0, -1, 0))) as fillet4_2_piece_2:
        with BuildLine():
            CenterArc((FILLET4_R, FILLET4_R), FILLET4_R, 180, 90)
            Line((0, FILLET4_R), (0, 0))
            Line((0, 0), (FILLET4_R, 0))
        make_face()
    extrude(amount=22.22499999999999, mode=Mode.SUBTRACT)
    with BuildSketch(Plane(origin=(44.449999999999996, -61.912499999999994, -9.525), x_dir=(-1, 0, 0), z_dir=(0, 1, 0))) as fillet4_2_piece_3:
        with BuildLine():
            CenterArc((FILLET4_R, FILLET4_R), FILLET4_R, 180, 90)
            Line((0, FILLET4_R), (0, 0))
            Line((0, 0), (FILLET4_R, 0))
        make_face()
    extrude(amount=25.4, mode=Mode.SUBTRACT)
    with BuildSketch(Plane(origin=(-44.449999999999996, -36.512499999999996, -9.525), x_dir=(1, 0, 0), z_dir=(0, -1, 0))) as fillet4_2_piece_4:
        with BuildLine():
            CenterArc((FILLET4_R, FILLET4_R), FILLET4_R, 180, 90)
            Line((-7.11e-15, FILLET4_R), (0, 0))
            Line((0, 0), (FILLET4_R, 0))
        make_face()
    extrude(amount=25.4, mode=Mode.SUBTRACT)
    with BuildSketch(Plane(origin=(47.62499999999999, 0, 17.21421041746987), x_dir=(1, -1.4e-16, 0), z_dir=(0, 0, -1))) as fillet4_2_piece_5:
        with BuildLine():
            CenterArc((3.075684166987948, 3.175), FILLET4_R, 183.58332169847216, 86.41667830152784)
            ThreePointArc((-0.0931085934483913, 2.976562499999989), (-0.02328283960383693, 1.4890091946139992), (0, 0))
            Line((0, 0), (3.0756841669879478, 0))
        make_face()
    extrude(amount=34.42842083493974, mode=Mode.SUBTRACT)
    with BuildSketch(Plane(origin=(-47.62499999999999, -9.39e-15, 17.21421041747397), x_dir=(0.03126528492627727, -0.9995111214781347, 0), z_dir=(0, 0, -1))) as fillet4_2_piece_6:
        with BuildLine():
            CenterArc((3.0772856688687185, 3.173447810693077), FILLET4_R, 181.79166084908871, 86.41667830167557)
            Line((-0.09616214182461408, 3.074180531060293), (0, 0))
            ThreePointArc((0, 0), (1.4890091946139077, 0.02328283960383078), (2.978018389227795, 0))
        make_face()
    extrude(amount=34.42842083494794, mode=Mode.SUBTRACT)
    with BuildSketch(Plane(origin=(-44.449999999999996, -61.9125, 28.575000000000003), x_dir=(1, 0, 0), z_dir=(0, 1, 0)), Plane(origin=(44.449999999999996, -36.512499999999996, 28.575000000000003), x_dir=(-1, 0, 0), z_dir=(0, -1, 0))) as fillet4_2_piece_7:
        with BuildLine():
            CenterArc((FILLET4_R, FILLET4_R), FILLET4_R, 180, 90)
            Line((0, FILLET4_R), (0, 0))
            Line((0, 0), (FILLET4_R, 0))
        make_face()
    extrude(amount=25.400000000000013, mode=Mode.SUBTRACT)
    with BuildSketch(Plane(origin=(-25.400000000000002, -36.512499999999996, 28.575000000000003), x_dir=(-1, 3.7e-16, 0), z_dir=(-3.7e-16, -1, 0)), Plane(origin=(25.4, -61.9125, 28.575000000000003), x_dir=(1, 3.7e-16, 0), z_dir=(-3.7e-16, 1, 0))) as fillet4_2_piece_8:
        with BuildLine():
            CenterArc((FILLET4_R, FILLET4_R), FILLET4_R, 180, 90)
            Line((0, FILLET4_R), (0, 0))
            Line((0, 0), (FILLET4_R, 0))
        make_face()
    extrude(amount=25.400000000000013, mode=Mode.SUBTRACT)
    with BuildSketch(Plane(origin=(66.30016907622587, -14.287500000000016, 9.525), x_dir=(-1, 0, 0), z_dir=(0, 1, 0))) as fillet4_2_piece_9:
        with BuildLine():
            CenterArc((FILLET4_R, -FILLET4_R), FILLET4_R, 90, 90)
            Line((0, -FILLET4_R), (0, 0))
            Line((0, 0), (FILLET4_R, 0))
        make_face()
    extrude(amount=22.22499999999999, mode=Mode.SUBTRACT)


solid = part.part
